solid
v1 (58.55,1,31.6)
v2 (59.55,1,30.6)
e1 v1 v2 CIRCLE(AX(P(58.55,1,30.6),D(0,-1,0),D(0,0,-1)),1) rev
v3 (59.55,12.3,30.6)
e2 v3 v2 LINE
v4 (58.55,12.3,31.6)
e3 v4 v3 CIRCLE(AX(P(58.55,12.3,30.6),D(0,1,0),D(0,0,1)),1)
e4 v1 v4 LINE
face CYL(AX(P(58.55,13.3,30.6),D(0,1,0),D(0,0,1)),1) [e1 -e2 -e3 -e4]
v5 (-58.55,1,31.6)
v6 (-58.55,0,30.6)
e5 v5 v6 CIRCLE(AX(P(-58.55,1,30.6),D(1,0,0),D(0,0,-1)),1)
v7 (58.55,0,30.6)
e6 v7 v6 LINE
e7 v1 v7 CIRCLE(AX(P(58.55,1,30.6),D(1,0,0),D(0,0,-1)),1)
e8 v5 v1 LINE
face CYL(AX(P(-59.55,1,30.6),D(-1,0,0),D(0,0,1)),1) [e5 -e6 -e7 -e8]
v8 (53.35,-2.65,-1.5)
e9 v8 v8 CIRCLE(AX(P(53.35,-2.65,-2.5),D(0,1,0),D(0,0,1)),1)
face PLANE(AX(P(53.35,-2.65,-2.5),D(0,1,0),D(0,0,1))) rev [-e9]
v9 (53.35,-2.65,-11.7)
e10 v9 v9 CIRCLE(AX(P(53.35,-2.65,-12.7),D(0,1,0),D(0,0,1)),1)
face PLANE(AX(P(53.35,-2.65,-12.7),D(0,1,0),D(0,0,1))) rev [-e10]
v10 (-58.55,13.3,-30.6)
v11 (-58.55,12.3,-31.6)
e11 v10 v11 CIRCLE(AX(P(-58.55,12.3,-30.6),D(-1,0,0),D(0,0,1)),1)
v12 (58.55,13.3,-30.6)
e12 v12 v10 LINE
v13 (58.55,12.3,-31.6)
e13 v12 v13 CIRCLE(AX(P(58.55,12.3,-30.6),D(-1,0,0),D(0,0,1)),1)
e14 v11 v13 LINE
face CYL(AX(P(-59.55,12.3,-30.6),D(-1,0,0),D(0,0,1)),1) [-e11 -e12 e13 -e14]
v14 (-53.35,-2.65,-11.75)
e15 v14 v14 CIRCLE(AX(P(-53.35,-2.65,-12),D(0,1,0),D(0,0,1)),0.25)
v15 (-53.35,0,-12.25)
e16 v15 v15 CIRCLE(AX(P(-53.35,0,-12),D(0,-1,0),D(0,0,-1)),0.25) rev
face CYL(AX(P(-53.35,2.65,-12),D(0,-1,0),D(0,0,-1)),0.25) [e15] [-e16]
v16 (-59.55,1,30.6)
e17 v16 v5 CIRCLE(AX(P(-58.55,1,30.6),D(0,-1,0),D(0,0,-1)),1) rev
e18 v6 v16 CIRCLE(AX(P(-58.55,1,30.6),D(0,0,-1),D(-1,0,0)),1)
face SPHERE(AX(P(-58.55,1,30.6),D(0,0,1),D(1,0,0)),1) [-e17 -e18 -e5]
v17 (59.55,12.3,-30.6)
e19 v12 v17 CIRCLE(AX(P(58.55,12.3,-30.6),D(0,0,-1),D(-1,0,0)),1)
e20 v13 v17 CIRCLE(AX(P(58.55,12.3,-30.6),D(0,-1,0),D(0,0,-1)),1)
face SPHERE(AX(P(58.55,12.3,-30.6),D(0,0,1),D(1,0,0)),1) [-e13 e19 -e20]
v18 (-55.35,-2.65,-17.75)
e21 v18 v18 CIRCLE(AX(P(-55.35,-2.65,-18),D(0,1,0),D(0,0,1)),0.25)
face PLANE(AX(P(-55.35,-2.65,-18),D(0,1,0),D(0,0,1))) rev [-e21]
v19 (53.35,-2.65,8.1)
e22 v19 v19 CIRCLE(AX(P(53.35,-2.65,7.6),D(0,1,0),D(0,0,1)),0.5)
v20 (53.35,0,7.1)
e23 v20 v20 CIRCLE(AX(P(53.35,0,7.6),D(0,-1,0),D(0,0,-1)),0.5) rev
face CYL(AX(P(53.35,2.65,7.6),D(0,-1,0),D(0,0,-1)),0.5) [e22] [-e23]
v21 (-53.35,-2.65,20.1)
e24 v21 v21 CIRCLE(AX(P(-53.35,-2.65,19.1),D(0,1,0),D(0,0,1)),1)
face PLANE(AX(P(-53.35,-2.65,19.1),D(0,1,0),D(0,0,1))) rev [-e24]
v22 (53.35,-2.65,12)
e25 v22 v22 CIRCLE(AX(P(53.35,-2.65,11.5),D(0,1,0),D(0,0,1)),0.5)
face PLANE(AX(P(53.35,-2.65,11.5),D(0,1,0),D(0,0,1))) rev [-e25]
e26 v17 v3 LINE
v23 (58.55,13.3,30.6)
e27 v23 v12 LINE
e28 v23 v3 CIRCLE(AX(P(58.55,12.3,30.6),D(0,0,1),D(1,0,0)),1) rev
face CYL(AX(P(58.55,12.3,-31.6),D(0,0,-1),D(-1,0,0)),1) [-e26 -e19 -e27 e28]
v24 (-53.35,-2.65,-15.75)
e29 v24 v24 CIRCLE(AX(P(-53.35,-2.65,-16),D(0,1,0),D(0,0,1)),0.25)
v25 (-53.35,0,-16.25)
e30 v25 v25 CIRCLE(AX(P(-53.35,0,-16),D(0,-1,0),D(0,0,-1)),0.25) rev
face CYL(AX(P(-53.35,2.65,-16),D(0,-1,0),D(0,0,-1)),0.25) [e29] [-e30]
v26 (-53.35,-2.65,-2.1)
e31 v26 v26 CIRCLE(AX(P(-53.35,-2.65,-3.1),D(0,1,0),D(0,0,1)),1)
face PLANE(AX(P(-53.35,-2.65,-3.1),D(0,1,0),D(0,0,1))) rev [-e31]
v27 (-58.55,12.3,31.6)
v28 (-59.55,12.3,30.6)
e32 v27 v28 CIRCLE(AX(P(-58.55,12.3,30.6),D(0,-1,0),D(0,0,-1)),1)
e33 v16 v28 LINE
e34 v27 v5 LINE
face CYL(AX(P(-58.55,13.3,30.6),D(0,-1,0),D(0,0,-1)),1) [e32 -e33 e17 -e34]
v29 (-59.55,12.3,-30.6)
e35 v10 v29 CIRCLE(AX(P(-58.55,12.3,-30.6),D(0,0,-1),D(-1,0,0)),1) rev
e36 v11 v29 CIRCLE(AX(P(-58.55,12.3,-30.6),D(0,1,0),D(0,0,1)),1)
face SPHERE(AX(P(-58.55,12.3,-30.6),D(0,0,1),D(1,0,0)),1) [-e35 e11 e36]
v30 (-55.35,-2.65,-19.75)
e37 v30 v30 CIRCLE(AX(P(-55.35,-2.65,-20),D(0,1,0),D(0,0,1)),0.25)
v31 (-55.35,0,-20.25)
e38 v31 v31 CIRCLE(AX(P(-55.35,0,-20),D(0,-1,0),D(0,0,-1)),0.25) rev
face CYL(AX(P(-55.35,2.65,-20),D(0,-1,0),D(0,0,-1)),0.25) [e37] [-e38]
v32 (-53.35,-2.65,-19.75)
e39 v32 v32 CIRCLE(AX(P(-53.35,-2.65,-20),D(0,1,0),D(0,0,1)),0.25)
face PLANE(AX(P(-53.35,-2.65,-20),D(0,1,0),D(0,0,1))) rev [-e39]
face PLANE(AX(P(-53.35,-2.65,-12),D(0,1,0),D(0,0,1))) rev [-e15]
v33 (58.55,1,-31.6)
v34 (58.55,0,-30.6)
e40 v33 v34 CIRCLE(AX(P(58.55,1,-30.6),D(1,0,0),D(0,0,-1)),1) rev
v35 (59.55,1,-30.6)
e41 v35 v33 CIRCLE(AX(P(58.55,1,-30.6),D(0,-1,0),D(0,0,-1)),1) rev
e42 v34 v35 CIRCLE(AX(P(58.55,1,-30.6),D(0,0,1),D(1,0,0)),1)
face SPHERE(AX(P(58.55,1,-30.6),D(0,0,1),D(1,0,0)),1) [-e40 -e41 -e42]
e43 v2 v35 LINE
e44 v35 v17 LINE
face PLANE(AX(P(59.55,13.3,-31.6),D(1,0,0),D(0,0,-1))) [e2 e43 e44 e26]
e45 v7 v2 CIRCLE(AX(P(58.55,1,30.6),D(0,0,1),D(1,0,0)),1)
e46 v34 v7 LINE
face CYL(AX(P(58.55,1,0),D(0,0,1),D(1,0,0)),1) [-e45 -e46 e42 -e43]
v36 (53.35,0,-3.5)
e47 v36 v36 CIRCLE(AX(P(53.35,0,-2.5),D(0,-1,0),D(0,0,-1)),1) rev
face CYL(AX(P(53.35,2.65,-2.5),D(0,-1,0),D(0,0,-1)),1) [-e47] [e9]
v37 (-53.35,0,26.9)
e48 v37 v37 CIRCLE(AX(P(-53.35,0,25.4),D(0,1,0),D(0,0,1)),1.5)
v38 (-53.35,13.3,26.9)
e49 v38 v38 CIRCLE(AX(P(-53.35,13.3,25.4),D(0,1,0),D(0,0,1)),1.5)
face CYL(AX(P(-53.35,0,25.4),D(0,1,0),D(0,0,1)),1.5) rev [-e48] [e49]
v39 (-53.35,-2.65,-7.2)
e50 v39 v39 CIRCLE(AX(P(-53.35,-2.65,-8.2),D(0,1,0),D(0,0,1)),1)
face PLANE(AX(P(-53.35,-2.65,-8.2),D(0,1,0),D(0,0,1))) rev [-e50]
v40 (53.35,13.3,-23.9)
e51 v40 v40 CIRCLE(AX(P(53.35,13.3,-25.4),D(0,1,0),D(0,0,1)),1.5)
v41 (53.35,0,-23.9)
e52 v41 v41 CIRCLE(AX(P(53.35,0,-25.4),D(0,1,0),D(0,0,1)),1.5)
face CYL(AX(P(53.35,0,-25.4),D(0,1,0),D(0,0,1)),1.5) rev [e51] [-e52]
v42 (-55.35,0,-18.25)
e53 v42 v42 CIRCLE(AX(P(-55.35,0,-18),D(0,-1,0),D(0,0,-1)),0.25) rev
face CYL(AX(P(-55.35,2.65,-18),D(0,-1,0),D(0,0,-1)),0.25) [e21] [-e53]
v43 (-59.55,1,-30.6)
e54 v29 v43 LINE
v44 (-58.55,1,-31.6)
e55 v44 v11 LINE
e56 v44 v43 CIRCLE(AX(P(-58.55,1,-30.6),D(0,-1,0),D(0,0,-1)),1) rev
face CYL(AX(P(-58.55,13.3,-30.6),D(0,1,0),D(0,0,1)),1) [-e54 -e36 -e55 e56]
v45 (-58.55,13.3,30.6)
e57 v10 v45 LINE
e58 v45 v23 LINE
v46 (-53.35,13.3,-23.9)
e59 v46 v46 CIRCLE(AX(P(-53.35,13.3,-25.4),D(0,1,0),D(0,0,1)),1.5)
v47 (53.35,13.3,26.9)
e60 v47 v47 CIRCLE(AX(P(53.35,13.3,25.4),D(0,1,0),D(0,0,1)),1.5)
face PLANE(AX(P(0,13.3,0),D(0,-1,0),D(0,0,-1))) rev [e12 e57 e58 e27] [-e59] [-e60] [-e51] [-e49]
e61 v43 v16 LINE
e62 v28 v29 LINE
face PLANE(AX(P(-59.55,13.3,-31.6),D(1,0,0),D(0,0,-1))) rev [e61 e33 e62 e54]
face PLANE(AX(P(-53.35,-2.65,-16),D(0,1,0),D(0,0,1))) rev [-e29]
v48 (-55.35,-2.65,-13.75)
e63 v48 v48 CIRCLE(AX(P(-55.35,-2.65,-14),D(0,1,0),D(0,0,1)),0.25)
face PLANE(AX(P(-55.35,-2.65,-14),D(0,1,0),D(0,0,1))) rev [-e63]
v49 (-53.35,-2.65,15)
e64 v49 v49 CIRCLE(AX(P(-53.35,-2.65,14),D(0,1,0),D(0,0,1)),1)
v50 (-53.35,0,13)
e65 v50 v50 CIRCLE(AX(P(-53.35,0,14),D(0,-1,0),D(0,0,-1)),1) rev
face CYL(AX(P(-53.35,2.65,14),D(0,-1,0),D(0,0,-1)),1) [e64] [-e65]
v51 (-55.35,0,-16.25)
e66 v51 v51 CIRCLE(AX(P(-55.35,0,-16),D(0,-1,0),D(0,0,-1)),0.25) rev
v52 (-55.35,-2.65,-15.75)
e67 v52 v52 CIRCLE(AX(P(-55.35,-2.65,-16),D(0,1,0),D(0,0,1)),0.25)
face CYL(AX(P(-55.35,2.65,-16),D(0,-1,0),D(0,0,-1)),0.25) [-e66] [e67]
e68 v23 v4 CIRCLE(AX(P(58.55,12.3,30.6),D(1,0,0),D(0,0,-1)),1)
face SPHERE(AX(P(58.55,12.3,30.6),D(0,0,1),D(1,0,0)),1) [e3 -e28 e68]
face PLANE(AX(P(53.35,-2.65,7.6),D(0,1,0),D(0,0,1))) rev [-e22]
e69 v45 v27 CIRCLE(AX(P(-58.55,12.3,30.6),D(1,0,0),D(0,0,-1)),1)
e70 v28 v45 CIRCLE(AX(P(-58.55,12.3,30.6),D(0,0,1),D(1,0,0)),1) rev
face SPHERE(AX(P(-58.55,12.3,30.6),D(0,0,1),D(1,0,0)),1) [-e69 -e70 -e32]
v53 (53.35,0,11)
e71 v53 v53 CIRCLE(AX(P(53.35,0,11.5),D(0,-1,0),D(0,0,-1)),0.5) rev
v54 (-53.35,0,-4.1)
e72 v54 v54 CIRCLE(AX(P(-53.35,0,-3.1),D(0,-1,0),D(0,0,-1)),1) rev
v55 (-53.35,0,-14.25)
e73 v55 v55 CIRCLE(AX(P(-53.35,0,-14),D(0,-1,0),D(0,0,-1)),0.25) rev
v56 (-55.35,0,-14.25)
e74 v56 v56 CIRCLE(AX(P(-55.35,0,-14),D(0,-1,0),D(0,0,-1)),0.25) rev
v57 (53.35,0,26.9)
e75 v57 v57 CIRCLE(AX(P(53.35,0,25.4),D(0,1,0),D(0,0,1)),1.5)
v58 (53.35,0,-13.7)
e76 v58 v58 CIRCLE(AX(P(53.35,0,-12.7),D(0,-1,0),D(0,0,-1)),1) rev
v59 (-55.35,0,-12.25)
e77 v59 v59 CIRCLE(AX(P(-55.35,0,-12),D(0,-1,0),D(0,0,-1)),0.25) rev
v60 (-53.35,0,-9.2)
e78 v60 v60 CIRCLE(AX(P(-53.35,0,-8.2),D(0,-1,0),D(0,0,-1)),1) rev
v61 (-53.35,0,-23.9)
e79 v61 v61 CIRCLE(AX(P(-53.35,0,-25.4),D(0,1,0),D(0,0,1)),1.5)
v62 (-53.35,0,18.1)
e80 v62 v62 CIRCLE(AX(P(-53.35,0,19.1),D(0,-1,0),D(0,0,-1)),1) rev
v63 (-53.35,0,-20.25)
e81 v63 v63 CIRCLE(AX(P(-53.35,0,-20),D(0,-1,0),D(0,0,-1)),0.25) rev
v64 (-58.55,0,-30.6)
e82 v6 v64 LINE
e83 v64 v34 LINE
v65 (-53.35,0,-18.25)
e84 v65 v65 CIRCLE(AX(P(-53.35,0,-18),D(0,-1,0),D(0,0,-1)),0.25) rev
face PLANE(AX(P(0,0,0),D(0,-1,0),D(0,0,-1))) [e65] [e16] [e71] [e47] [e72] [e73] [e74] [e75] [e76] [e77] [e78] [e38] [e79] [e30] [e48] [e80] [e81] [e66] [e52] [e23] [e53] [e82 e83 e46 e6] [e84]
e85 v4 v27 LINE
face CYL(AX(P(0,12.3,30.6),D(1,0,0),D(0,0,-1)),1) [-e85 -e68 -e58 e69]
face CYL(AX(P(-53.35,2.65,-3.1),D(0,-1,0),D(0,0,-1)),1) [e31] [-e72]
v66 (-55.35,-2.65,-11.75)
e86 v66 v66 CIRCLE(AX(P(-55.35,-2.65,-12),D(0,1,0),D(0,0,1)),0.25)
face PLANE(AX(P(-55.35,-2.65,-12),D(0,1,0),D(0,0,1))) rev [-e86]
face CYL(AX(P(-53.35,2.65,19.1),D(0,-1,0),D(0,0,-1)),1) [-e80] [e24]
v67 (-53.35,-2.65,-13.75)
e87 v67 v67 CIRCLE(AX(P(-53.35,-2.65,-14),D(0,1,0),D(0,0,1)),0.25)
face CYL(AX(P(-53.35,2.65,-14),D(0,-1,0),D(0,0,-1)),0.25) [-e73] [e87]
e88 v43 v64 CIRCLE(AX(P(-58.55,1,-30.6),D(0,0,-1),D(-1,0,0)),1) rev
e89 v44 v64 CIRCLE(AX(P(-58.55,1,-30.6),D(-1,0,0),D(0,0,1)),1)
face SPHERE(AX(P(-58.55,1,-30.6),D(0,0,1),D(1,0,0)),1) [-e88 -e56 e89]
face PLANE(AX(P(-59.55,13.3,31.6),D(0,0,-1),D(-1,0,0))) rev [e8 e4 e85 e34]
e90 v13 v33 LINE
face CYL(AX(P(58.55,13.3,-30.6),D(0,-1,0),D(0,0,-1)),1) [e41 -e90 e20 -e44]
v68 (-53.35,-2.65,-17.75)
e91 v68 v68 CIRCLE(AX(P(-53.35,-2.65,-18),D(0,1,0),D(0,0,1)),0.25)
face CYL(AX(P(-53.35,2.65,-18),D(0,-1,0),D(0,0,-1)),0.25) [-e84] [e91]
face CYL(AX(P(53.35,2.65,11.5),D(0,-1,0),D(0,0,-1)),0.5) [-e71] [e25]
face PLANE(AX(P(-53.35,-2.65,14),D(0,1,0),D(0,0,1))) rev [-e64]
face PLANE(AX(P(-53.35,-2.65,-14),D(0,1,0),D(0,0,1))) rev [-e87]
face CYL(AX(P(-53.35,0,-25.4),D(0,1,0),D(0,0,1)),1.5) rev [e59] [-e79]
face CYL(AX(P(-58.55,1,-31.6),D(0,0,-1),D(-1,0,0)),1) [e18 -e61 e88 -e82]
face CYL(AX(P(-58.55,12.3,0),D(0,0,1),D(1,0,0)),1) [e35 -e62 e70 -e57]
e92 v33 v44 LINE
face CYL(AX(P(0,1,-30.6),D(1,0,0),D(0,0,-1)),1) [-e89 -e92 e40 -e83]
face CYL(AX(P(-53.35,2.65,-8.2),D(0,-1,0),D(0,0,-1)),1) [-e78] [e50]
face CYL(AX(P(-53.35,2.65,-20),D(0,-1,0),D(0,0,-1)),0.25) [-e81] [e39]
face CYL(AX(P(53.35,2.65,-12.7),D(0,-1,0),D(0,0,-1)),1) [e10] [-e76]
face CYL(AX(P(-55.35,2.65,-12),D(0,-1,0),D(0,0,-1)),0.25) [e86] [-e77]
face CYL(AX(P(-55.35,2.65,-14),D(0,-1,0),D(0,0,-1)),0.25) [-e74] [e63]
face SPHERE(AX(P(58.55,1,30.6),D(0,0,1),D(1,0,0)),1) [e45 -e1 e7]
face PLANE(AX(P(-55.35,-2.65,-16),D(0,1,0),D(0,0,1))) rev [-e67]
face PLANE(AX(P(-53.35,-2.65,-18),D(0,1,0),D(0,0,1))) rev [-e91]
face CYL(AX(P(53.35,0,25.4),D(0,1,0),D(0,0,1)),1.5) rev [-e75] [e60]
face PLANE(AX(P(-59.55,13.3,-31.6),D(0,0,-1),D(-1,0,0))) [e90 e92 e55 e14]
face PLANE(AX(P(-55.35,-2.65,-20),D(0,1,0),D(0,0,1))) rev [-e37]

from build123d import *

# Parameters (mm, degrees)
SKETCH_1_W          = 119.1
SKETCH_1_H          = 63.2
EXTRUDE_1_DEPTH     = 13.3
SKETCH_2_R          = 1.5
CUT_EXTRUDE_1_DEPTH = 13.3
SKETCH_3_R          = 1.5
CUT_EXTRUDE_2_DEPTH = 13.3
SKETCH_4_R          = 1.5
CUT_EXTRUDE_3_DEPTH = 13.3
SKETCH_5_R          = 1.5
CUT_EXTRUDE_4_DEPTH = 13.3
SKETCH_7_R          = 0.25
EXTRUDE_4_DEPTH     = 2.65
SKETCH_8_R          = 0.25
EXTRUDE_5_DEPTH     = 2.65
SKETCH_9_R          = 0.25
EXTRUDE_6_DEPTH     = 2.65
SKETCH_10_R         = 1
SKETCH_10_R_2       = 0.5
EXTRUDE_7_DEPTH     = 2.65
FILLET_1_R          = 1
FILLET_2_R          = 1


with BuildPart() as part:
    # 草图1 → 凸台-拉伸1 (new body)
    with BuildSketch(Plane(origin=(0, 0, 0), x_dir=(1, 0, 0), z_dir=(0, 1, 0))):
        Rectangle(SKETCH_1_W, SKETCH_1_H)
    extrude(amount=EXTRUDE_1_DEPTH)

    # 草图2 → 切除-拉伸1 (cut)
    with BuildSketch(Plane(origin=(0, 13.3, 0), x_dir=(1, 0, 0), z_dir=(0, 1, 0))):
        with Locations(Location((-53.35, 25.4, 0), (0, 0, 270))):
            Circle(SKETCH_2_R)
    extrude(amount=-CUT_EXTRUDE_1_DEPTH, mode=Mode.SUBTRACT)

    # 草图3 → 切除-拉伸2 (cut)
    with BuildSketch(Plane(origin=(0, 13.3, 0), x_dir=(1, 0, 0), z_dir=(0, 1, 0))):
        with Locations(Location((53.35, 25.4, 0), (0, 0, 270))):
            Circle(SKETCH_3_R)
    extrude(amount=-CUT_EXTRUDE_2_DEPTH, mode=Mode.SUBTRACT)

    # 草图4 → 切除-拉伸3 (cut)
    with BuildSketch(Plane(origin=(0, 13.3, 0), x_dir=(1, 0, 0), z_dir=(0, 1, 0))):
        with Locations(Location((-53.35, -25.4, 0), (0, 0, 270))):
            Circle(SKETCH_4_R)
    extrude(amount=-CUT_EXTRUDE_3_DEPTH, mode=Mode.SUBTRACT)

    # 草图5 → 切除-拉伸4 (cut)
    with BuildSketch(Plane(origin=(0, 13.3, 0), x_dir=(1, 0, 0), z_dir=(0, 1, 0))):
        with Locations(Location((53.35, -25.4, 0), (0, 0, 270))):
            Circle(SKETCH_5_R)
    extrude(amount=-CUT_EXTRUDE_4_DEPTH, mode=Mode.SUBTRACT)

    # 草图7 → 凸台-拉伸4 (add, symmetric)
    with BuildSketch(Plane(origin=(0, 0, 0), x_dir=(1, 0, 0), z_dir=(0, 1, 0))):
        with Locations(Location((-53.35, 20, 0), (0, 0, 90))):
            Circle(SKETCH_7_R)
    extrude(amount=EXTRUDE_4_DEPTH, both=True)

    # 草图8 → 凸台-拉伸5 (add, symmetric)
    with BuildSketch(Plane(origin=(0, 0, 0), x_dir=(1, 0, 0), z_dir=(0, 1, 0))):
        with Locations(Location((-53.35, 18, 0), (0, 0, 90))):
            Circle(SKETCH_8_R)
        with Locations(Location((-53.35, 16, 0), (0, 0, 90))):
            Circle(SKETCH_8_R)
        with Locations(Location((-53.35, 14, 0), (0, 0, 90))):
            Circle(SKETCH_8_R)
        with Locations(Location((-53.35, 12, 0), (0, 0, 90))):
            Circle(SKETCH_8_R)
    extrude(amount=EXTRUDE_5_DEPTH, both=True)

    # 草图9 → 凸台-拉伸6 (add, symmetric)
    with BuildSketch(Plane(origin=(0, 0, 0), x_dir=(1, 0, 0), z_dir=(0, 1, 0))):
        with Locations(Location((-55.35, 20, 0), (0, 0, 90))):
            Circle(SKETCH_9_R)
        with Locations(Location((-55.35, 18, 0), (0, 0, 90))):
            Circle(SKETCH_9_R)
        with Locations(Location((-55.35, 16, 0), (0, 0, 90))):
            Circle(SKETCH_9_R)
        with Locations(Location((-55.35, 14, 0), (0, 0, 90))):
            Circle(SKETCH_9_R)
        with Locations(Location((-55.35, 12, 0), (0, 0, 90))):
            Circle(SKETCH_9_R)
    extrude(amount=EXTRUDE_6_DEPTH, both=True)

    # 草图10 → 凸台-拉伸7 (add, symmetric)
    with BuildSketch(Plane(origin=(0, 0, 0), x_dir=(1, 0, 0), z_dir=(0, 1, 0))):
        with Locations(Location((-53.35, 8.2, 0), (0, 0, 90))):
            Circle(SKETCH_10_R)
        with Locations(Location((-53.35, 3.1, 0), (0, 0, 90))):
            Circle(SKETCH_10_R)
        with Locations(Location((-53.35, -14, 0), (0, 0, 90))):
            Circle(SKETCH_10_R)
        with Locations(Location((-53.35, -19.1, 0), (0, 0, 90))):
            Circle(SKETCH_10_R)
        with Locations(Location((53.35, 2.5, 0), (0, 0, 90))):
            Circle(SKETCH_10_R)
        with Locations(Location((53.35, 12.7, 0), (0, 0, 90))):
            Circle(SKETCH_10_R)
        with Locations(Location((53.35, -7.6, 0), (0, 0, 90))):
            Circle(SKETCH_10_R_2)
        with Locations(Location((53.35, -11.5, 0), (0, 0, 90))):
            Circle(SKETCH_10_R_2)
    extrude(amount=EXTRUDE_7_DEPTH, both=True)

    # 圆角1
    fillet_1_edges = [part.edges().sort_by_distance(p)[0] for p in [
        (-59.55, 13.3, 0),
        (0, 13.3, -31.6),
        (-59.55, 0, 0),
        (0, 0, -31.6),
        (-59.55, 6.65, -31.6),
        (-59.55, 6.65, 31.6),
        (59.55, 6.65, -31.6),
    ]]
    fillet(fillet_1_edges, radius=FILLET_1_R)

    # 圆角2
    # the kernel refuses this fillet: 1 mm, written as the material it takes off along each edge
    with BuildSketch(Plane(origin=(58.55, 1, -30.6), x_dir=(0, -1, 0), z_dir=(1, 0, 0))) as fillet_2_piece_1_section:
        Polygon((0, 0), (FILLET_2_R, 0), (FILLET_2_R, FILLET_2_R), (0, FILLET_2_R), align=None)
    fillet_2_piece_1 = extrude(amount=FILLET_2_R, mode=Mode.PRIVATE)
    fillet_2_piece_1 = fillet_2_piece_1 - Plane(origin=(58.55, 1, -30.6), x_dir=(0, 0.7071067811865475, 0.7071067811865475), z_dir=(1, 0, 0)) * Sphere(FILLET_2_R, mode=Mode.PRIVATE)
    add(fillet_2_piece_1, mode=Mode.SUBTRACT)
    with BuildSketch(Plane(origin=(58.55, 12.3, -30.6), x_dir=(1, 0, 0), z_dir=(0, 1, 0))) as fillet_2_piece_2_section:
        Polygon((0, 0), (FILLET_2_R, 0), (FILLET_2_R, FILLET_2_R), (0, FILLET_2_R), align=None)
    fillet_2_piece_2 = extrude(amount=FILLET_2_R, mode=Mode.PRIVATE)
    fillet_2_piece_2 = fillet_2_piece_2 - Plane(origin=(58.55, 12.3, -30.6), x_dir=(-0.7071067811865475, 0, 0.7071067811865477), z_dir=(0, 1, 0)) * Sphere(FILLET_2_R, mode=Mode.PRIVATE)
    add(fillet_2_piece_2, mode=Mode.SUBTRACT)
    with BuildSketch(Plane(origin=(-58.55, 1, 30.6), x_dir=(0, 0, 1), z_dir=(0, -1, 0))) as fillet_2_piece_3_section:
        Polygon((0, 0), (FILLET_2_R, 0), (FILLET_2_R, FILLET_2_R), (0, FILLET_2_R), align=None)
    fillet_2_piece_3 = extrude(amount=FILLET_2_R, mode=Mode.PRIVATE)
    fillet_2_piece_3 = fillet_2_piece_3 - Plane(origin=(-58.55, 1, 30.6), x_dir=(0.7071067811865475, 0, -0.7071067811865475), z_dir=(0, -1, 0)) * Sphere(FILLET_2_R, mode=Mode.PRIVATE)
    add(fillet_2_piece_3, mode=Mode.SUBTRACT)
    with BuildSketch(Plane(origin=(-58.55, 12.3, 30.6), x_dir=(0, 0, 1), z_dir=(0, 1, 0))) as fillet_2_piece_4_section:
        Polygon((0, 0), (FILLET_2_R, 0), (FILLET_2_R, -FILLET_2_R), (0, -FILLET_2_R), align=None)
    fillet_2_piece_4 = extrude(amount=FILLET_2_R, mode=Mode.PRIVATE)
    fillet_2_piece_4 = fillet_2_piece_4 - Plane(origin=(-58.55, 12.3, 30.6), x_dir=(0.7071067811865475, 0, -0.7071067811865475), z_dir=(0, 1, 0)) * Sphere(FILLET_2_R, mode=Mode.PRIVATE)
    add(fillet_2_piece_4, mode=Mode.SUBTRACT)
    with BuildSketch(Plane(origin=(58.55, 12.3, 30.6), x_dir=(0, 0, 1), z_dir=(1, 0, 0))) as fillet_2_piece_5_section:
        Polygon((0, 0), (FILLET_2_R, 0), (FILLET_2_R, -FILLET_2_R), (0, -FILLET_2_R), align=None)
    fillet_2_piece_5 = extrude(amount=FILLET_2_R, mode=Mode.PRIVATE)
    fillet_2_piece_5 = fillet_2_piece_5 - Plane(origin=(58.55, 12.3, 30.6), x_dir=(0, -0.7071067811865475, -0.7071067811865475), z_dir=(1, 0, 0)) * Sphere(FILLET_2_R, mode=Mode.PRIVATE)
    add(fillet_2_piece_5, mode=Mode.SUBTRACT)
    with BuildSketch(Plane(origin=(58.55, 1, 30.6), x_dir=(0, -1, 0), z_dir=(1, 0, 0))) as fillet_2_piece_6_section:
        Polygon((0, 0), (FILLET_2_R, 0), (FILLET_2_R, -FILLET_2_R), (0, -FILLET_2_R), align=None)
    fillet_2_piece_6 = extrude(amount=FILLET_2_R, mode=Mode.PRIVATE)
    fillet_2_piece_6 = fillet_2_piece_6 - Plane(origin=(58.55, 1, 30.6), x_dir=(0, 0.7071067811865475, -0.7071067811865475), z_dir=(1, 0, 0)) * Sphere(FILLET_2_R, mode=Mode.PRIVATE)
    add(fillet_2_piece_6, mode=Mode.SUBTRACT)
    with BuildSketch(Plane(origin=(58.55, 13.3, 31.6), x_dir=(0, 0, -1), z_dir=(-1, 0, 0))) as fillet_2_piece_7:
        with BuildLine():
            CenterArc((FILLET_2_R, FILLET_2_R), FILLET_2_R, 180, 90)
            Line((0, FILLET_2_R), (0, 0))
            Line((0, 0), (FILLET_2_R, 0))
        make_face()
    extrude(amount=117.1, mode=Mode.SUBTRACT)
    with BuildSketch(Plane(origin=(59.55, 13.3, -30.6), x_dir=(-1, 0, 0), z_dir=(0, 0, 1)), Plane(origin=(59.55, 0, -30.6), x_dir=(0, 1, 0), z_dir=(0, 0, 1))) as fillet_2_piece_8:
        with BuildLine():
            CenterArc((FILLET_2_R, FILLET_2_R), FILLET_2_R, 180, 90)
            Line((0, FILLET_2_R), (0, 0))
            Line((0, 0), (FILLET_2_R, 0))
        make_face()
    extrude(amount=61.2, mode=Mode.SUBTRACT)
    with BuildSketch(Plane(origin=(58.55, 0, 31.6), x_dir=(0, 0, -1), z_dir=(-1, 0, 0))) as fillet_2_piece_9:
        with BuildLine():
            CenterArc((FILLET_2_R, -FILLET_2_R), FILLET_2_R, 90, 90)
            Line((0, -FILLET_2_R), (0, 0))
            Line((0, 0), (FILLET_2_R, 0))
        make_face()
    extrude(amount=117.1, mode=Mode.SUBTRACT)
    with BuildSketch(Plane(origin=(59.55, 1, 31.6), x_dir=(0, 0, -1), z_dir=(0, 1, 0))) as fillet_2_piece_10:
        with BuildLine():
            CenterArc((FILLET_2_R, FILLET_2_R), FILLET_2_R, 180, 90)
            Line((0, FILLET_2_R), (0, 0))
            Line((0, 0), (FILLET_2_R, 0))
        make_face()
    extrude(amount=11.3, mode=Mode.SUBTRACT)


solid = part.part
